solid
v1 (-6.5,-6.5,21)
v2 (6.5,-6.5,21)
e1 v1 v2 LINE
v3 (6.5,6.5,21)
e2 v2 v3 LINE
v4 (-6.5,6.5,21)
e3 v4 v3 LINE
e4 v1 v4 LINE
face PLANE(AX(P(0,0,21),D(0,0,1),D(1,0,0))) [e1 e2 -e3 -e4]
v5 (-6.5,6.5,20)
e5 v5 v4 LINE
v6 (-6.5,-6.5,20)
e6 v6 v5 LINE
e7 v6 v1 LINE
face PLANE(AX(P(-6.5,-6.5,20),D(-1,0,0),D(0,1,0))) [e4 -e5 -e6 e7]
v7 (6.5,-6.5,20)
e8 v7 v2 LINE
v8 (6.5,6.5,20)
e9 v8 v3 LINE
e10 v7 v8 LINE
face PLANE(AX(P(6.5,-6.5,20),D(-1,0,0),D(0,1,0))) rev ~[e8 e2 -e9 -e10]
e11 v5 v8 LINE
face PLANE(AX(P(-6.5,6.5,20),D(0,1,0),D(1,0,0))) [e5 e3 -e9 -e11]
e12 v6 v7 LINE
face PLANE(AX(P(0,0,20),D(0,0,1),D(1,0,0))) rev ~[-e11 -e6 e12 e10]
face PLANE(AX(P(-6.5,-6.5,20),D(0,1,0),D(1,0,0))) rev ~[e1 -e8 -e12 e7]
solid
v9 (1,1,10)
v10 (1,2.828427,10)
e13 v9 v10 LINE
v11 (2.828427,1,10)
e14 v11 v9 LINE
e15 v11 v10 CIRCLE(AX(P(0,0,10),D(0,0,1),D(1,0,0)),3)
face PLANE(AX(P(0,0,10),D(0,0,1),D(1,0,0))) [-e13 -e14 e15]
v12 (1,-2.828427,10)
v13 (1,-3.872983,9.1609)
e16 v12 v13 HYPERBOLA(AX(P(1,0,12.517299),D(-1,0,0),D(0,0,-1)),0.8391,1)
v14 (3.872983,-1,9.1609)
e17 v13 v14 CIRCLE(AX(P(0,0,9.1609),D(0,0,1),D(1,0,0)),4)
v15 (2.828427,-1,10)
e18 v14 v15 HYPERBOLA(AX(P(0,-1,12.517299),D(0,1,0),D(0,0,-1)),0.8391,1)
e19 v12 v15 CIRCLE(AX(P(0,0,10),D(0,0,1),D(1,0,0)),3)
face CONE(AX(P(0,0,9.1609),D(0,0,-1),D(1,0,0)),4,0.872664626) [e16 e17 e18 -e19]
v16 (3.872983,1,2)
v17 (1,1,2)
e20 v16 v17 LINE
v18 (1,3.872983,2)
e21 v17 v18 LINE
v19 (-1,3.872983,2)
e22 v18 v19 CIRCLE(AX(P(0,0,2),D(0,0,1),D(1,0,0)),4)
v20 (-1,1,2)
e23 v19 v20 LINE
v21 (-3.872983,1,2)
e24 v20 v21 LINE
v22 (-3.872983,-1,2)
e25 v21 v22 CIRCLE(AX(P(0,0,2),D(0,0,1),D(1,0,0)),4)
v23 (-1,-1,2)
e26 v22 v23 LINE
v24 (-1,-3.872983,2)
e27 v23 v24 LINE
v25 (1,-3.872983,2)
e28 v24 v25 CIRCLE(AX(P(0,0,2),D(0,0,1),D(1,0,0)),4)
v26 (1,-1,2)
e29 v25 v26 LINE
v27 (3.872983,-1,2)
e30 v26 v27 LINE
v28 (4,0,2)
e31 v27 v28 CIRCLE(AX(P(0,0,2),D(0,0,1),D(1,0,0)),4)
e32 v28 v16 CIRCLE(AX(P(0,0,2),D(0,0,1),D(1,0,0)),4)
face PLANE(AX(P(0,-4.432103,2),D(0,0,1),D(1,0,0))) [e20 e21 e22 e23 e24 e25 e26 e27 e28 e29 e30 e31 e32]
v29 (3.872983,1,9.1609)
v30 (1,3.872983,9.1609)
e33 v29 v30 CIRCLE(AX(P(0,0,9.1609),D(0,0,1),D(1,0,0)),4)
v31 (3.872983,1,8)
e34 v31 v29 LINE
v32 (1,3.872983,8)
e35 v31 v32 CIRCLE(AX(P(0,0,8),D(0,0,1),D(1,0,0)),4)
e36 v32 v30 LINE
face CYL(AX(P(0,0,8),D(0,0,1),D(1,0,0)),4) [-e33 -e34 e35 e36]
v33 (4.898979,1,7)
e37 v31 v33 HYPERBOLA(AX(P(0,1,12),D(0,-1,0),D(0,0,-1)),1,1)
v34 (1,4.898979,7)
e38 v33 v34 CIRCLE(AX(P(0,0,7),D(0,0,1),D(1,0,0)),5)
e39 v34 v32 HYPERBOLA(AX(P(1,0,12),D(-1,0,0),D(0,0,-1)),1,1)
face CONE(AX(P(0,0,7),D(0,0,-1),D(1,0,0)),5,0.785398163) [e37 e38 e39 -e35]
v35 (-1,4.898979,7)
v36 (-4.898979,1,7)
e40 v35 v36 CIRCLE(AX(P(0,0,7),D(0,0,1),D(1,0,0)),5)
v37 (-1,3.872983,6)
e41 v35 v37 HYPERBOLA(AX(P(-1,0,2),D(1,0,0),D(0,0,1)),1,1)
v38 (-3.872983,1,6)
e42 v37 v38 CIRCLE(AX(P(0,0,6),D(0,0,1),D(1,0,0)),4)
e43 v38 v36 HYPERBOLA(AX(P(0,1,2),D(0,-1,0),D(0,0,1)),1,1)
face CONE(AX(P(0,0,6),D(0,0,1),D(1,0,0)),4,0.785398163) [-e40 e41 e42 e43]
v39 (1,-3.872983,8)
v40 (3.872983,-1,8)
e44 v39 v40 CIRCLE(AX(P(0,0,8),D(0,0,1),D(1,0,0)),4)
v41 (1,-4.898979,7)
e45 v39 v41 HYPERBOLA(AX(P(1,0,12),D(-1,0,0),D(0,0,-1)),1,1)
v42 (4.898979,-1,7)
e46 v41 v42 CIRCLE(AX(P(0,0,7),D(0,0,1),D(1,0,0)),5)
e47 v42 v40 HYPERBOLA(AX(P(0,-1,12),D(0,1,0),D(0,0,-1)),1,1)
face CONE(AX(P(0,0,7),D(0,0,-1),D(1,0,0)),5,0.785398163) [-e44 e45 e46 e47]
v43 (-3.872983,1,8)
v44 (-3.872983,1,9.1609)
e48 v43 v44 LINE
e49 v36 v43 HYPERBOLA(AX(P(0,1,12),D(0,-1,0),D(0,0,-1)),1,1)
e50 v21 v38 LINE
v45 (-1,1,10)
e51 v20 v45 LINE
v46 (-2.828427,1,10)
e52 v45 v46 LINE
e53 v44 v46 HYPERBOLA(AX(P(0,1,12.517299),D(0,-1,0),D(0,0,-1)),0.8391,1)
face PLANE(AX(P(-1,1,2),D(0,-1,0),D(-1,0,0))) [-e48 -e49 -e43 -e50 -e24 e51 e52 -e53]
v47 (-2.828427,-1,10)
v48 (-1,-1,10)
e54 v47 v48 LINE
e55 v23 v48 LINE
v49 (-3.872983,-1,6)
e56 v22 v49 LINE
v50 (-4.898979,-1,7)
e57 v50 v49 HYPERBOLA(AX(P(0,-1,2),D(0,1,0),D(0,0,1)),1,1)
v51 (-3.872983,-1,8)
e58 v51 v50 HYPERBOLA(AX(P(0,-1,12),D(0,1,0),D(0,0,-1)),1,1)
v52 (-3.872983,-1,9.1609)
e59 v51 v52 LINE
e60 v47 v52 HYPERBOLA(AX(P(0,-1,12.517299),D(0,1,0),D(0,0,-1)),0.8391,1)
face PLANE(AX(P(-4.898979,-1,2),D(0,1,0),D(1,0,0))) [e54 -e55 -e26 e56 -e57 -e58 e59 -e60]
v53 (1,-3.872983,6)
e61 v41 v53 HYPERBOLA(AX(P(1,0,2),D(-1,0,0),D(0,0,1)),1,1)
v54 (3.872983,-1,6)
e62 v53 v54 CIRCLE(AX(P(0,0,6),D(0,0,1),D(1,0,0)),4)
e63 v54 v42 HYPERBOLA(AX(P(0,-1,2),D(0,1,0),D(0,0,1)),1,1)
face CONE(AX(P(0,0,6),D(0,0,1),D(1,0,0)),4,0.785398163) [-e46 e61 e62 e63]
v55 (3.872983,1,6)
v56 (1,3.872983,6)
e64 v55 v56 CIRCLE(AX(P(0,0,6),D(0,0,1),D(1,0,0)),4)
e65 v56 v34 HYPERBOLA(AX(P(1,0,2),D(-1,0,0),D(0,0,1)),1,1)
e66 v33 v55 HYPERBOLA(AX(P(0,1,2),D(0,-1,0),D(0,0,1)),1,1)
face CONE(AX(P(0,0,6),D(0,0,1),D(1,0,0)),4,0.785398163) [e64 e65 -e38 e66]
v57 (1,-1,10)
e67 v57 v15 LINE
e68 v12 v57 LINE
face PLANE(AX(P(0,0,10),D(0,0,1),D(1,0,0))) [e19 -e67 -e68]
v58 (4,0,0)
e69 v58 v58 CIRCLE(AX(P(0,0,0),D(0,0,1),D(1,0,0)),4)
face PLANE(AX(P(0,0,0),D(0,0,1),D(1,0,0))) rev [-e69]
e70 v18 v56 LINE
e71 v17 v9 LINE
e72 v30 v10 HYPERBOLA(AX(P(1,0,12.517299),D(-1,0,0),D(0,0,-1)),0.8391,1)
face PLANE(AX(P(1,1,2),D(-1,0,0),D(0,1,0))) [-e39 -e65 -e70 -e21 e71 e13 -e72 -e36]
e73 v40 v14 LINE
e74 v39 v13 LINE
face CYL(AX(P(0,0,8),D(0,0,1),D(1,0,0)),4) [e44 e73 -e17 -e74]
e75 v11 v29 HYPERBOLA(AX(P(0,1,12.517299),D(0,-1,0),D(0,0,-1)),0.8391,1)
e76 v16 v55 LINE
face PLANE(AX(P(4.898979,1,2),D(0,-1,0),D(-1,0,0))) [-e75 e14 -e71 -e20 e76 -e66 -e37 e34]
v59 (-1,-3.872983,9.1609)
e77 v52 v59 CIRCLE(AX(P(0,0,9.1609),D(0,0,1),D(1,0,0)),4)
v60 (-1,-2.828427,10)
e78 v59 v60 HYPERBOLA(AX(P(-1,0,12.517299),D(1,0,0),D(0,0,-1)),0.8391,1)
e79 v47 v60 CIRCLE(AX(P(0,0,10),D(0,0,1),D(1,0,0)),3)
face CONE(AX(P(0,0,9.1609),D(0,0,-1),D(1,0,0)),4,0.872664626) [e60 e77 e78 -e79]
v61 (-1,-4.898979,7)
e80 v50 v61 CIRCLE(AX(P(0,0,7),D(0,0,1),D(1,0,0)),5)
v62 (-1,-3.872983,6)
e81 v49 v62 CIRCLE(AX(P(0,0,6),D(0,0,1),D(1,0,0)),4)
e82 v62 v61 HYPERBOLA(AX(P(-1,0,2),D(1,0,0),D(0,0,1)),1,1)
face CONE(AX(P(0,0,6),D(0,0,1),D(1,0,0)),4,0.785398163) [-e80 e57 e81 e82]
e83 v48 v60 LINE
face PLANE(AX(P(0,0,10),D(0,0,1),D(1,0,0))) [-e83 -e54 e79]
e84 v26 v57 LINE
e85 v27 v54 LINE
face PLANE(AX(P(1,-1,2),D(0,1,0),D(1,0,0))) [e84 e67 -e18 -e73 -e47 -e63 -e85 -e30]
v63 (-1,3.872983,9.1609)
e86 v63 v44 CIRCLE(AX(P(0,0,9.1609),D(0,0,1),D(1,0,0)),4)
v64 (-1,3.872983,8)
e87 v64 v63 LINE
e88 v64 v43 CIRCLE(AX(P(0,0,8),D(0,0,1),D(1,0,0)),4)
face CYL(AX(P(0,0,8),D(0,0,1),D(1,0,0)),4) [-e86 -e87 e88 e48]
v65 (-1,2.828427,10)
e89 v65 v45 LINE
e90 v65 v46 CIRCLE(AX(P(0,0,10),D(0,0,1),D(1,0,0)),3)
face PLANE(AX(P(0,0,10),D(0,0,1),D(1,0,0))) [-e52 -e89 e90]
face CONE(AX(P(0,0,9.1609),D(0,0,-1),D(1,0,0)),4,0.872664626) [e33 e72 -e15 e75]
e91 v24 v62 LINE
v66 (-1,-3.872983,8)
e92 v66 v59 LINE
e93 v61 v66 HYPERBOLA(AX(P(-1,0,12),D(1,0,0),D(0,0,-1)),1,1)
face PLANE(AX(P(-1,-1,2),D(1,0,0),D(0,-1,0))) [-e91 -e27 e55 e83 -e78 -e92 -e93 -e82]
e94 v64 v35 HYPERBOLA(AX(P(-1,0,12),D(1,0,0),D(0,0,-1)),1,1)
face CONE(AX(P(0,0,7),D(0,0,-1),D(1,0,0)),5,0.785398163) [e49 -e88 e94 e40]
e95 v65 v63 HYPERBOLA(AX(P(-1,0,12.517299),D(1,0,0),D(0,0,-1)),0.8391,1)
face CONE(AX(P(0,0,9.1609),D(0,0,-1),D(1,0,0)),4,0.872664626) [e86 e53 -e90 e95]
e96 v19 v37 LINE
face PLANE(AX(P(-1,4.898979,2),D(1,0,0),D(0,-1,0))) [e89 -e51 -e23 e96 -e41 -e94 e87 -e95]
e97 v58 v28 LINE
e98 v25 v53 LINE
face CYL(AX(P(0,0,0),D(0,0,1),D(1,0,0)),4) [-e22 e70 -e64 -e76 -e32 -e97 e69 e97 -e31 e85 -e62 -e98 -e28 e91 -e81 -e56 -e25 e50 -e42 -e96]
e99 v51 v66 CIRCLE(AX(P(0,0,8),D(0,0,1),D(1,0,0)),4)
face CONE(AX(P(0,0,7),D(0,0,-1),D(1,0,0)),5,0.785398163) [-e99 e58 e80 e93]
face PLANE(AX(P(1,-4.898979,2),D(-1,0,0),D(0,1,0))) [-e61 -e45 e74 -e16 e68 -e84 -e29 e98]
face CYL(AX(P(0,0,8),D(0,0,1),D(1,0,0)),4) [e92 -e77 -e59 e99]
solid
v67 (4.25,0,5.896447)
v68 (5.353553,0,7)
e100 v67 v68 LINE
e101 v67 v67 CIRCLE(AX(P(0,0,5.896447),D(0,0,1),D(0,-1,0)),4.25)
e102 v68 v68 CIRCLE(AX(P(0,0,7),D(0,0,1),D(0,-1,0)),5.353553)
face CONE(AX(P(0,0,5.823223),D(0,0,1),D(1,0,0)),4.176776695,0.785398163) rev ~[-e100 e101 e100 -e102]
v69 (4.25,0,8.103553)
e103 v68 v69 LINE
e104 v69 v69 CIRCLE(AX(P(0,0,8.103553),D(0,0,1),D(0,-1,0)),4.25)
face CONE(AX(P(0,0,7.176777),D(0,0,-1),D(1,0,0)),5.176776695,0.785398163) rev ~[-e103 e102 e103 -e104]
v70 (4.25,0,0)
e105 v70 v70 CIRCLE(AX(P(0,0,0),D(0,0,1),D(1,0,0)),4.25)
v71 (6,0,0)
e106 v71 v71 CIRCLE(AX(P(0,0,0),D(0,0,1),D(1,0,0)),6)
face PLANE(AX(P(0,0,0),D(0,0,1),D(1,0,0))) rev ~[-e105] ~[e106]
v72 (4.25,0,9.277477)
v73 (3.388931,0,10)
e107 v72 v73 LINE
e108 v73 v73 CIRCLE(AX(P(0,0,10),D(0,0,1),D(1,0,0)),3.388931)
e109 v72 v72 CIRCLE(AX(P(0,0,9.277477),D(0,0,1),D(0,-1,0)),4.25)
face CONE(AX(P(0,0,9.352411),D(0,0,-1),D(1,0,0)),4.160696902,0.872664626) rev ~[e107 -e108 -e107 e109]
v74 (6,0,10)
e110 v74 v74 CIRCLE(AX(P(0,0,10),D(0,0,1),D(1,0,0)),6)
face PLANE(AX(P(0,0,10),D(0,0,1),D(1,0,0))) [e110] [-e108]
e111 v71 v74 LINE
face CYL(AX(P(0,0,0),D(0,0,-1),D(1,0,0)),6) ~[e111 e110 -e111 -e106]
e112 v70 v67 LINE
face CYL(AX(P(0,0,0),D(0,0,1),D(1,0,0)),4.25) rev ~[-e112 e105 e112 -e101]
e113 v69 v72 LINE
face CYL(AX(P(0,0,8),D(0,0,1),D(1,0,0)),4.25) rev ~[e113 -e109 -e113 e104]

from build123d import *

# Parameters (mm, degrees)
F3_R      = 6
F4_DEPTH  = 10
F5_OFFSET = 0.25
F6_START  = 2
F2_W      = 2
F2_H      = 2
F6_DEPTH  = 8
F8_W      = 13
F8_H      = 13
F9_DEPTH  = 1


with BuildPart() as f1:
    # F0 (on Front) → F1 (revolve)
    with BuildSketch(Plane.XZ):
        Polygon((3, 10), (0, 10), (0, 0), (4, 0), (4, 6), (5, 7), (4, 8), (4, 9.1609003688), align=None)
    revolve(axis=Axis((0, 0, 5), (0, 0, 1)))


with BuildPart() as f4:
    # F3 (on Top) → F4 (new body, through all)
    with BuildSketch(Plane.XY):
        Circle(F3_R)
    extrude(amount=F4_DEPTH)

    # F5: cut F1, made larger all round first
    f5_tool = offset(f1.part, amount=F5_OFFSET, kind=Kind.INTERSECTION, mode=Mode.PRIVATE)
    add(f5_tool, mode=Mode.SUBTRACT)


with BuildPart() as f1_1:
    add(f1.part)

    # F2 (on Top) → F6 (cut)
    with BuildSketch(Plane.XY.offset(F6_START)):
        with BuildLine():
            ThreePointArc((0, -5), (0.50254481, -4.974680765), (1, -4.8989794856))
            Line((1, -4.8989794856), (1, -3.8729833462))
            ThreePointArc((1, -3.8729833462), (0, -4), (-1, -3.8729833462))
            Line((-1, -3.8729833462), (-1, -4.8989794856))
            ThreePointArc((-1, -4.8989794856), (-0.50254481, -4.974680765), (0, -5))
        make_face()
        with BuildLine():
            ThreePointArc((4.8989794856, -1), (4.974680765, -0.50254481), (5, 0))
            ThreePointArc((5, 0), (4.974680765, 0.50254481), (4.8989794856, 1))
            Line((4.8989794856, 1), (3.8729833462, 1))
            ThreePointArc((3.8729833462, 1), (3.9681187851, 0.5040171699), (4, 0))
            ThreePointArc((4, 0), (3.9681187851, -0.5040171699), (3.8729833462, -1))
            Line((3.8729833462, -1), (4.8989794856, -1))
        make_face()
        with BuildLine():
            Line((-3.8729833462, 1), (-4.8989794856, 1))
            ThreePointArc((-4.8989794856, 1), (-4.974680765, 0.50254481), (-5, 0))
            ThreePointArc((-5, 0), (-4.974680765, -0.50254481), (-4.8989794856, -1))
            Line((-4.8989794856, -1), (-3.8729833462, -1))
            ThreePointArc((-3.8729833462, -1), (-4, 0), (-3.8729833462, 1))
        make_face()
        with BuildLine():
            ThreePointArc((-1, -3.8729833462), (0, -4), (1, -3.8729833462))
            Line((1, -3.8729833462), (1, -2.8284271247))
            ThreePointArc((1, -2.8284271247), (0, -3), (-1, -2.8284271247))
            Line((-1, -2.8284271247), (-1, -3.8729833462))
        make_face()
        with BuildLine():
            ThreePointArc((-1, -2.8284271247), (0, -3), (1, -2.8284271247))
            Line((1, -2.8284271247), (1, -1))
            Line((1, -1), (-1, -1))
            Line((-1, -1), (-1, -2.8284271247))
        make_face()
        Rectangle(F2_W, F2_H)
        with BuildLine():
            Line((-1, -1), (-1, 1))
            Line((-1, 1), (-2.8284271247, 1))
            ThreePointArc((-2.8284271247, 1), (-3, 0), (-2.8284271247, -1))
            Line((-2.8284271247, -1), (-1, -1))
        make_face()
        with BuildLine():
            Line((-2.8284271247, 1), (-3.8729833462, 1))
            ThreePointArc((-3.8729833462, 1), (-4, 0), (-3.8729833462, -1))
            Line((-3.8729833462, -1), (-2.8284271247, -1))
            ThreePointArc((-2.8284271247, -1), (-3, 0), (-2.8284271247, 1))
        make_face()
        with BuildLine():
            ThreePointArc((3, 0), (2.956795679, 0.5073059362), (2.8284271247, 1))
            Line((2.8284271247, 1), (1, 1))
            Line((1, 1), (1, -1))
            Line((1, -1), (2.8284271247, -1))
            ThreePointArc((2.8284271247, -1), (2.956795679, -0.5073059362), (3, 0))
        make_face()
        with BuildLine():
            ThreePointArc((4, 0), (3.9681187851, 0.5040171699), (3.8729833462, 1))
            Line((3.8729833462, 1), (2.8284271247, 1))
            ThreePointArc((2.8284271247, 1), (2.956795679, 0.5073059362), (3, 0))
            ThreePointArc((3, 0), (2.956795679, -0.5073059362), (2.8284271247, -1))
            Line((2.8284271247, -1), (3.8729833462, -1))
            ThreePointArc((3.8729833462, -1), (3.9681187851, -0.5040171699), (4, 0))
        make_face()
        with BuildLine():
            Line((1, 1), (1, 2.8284271247))
            ThreePointArc((1, 2.8284271247), (0, 3), (-1, 2.8284271247))
            Line((-1, 2.8284271247), (-1, 1))
            Line((-1, 1), (1, 1))
        make_face()
        with BuildLine():
            Line((1, 2.8284271247), (1, 3.8729833462))
            ThreePointArc((1, 3.8729833462), (0, 4), (-1, 3.8729833462))
            Line((-1, 3.8729833462), (-1, 2.8284271247))
            ThreePointArc((-1, 2.8284271247), (0, 3), (1, 2.8284271247))
        make_face()
        with BuildLine():
            Line((1, 3.8729833462), (1, 4.8989794856))
            ThreePointArc((1, 4.8989794856), (0.50254481, 4.974680765), (0, 5))
            ThreePointArc((0, 5), (-0.50254481, 4.974680765), (-1, 4.8989794856))
            Line((-1, 4.8989794856), (-1, 3.8729833462))
            ThreePointArc((-1, 3.8729833462), (0, 4), (1, 3.8729833462))
        make_face()
    extrude(amount=F6_DEPTH, mode=Mode.SUBTRACT)


with BuildPart() as f9:
    # F8 (on offset) → F9 (new body)
    with BuildSketch(Plane.XY.offset(20)):
        Rectangle(F8_W, F8_H)
    extrude(amount=F9_DEPTH)


solid = Compound([f4.part, f1_1.part, f9.part])
